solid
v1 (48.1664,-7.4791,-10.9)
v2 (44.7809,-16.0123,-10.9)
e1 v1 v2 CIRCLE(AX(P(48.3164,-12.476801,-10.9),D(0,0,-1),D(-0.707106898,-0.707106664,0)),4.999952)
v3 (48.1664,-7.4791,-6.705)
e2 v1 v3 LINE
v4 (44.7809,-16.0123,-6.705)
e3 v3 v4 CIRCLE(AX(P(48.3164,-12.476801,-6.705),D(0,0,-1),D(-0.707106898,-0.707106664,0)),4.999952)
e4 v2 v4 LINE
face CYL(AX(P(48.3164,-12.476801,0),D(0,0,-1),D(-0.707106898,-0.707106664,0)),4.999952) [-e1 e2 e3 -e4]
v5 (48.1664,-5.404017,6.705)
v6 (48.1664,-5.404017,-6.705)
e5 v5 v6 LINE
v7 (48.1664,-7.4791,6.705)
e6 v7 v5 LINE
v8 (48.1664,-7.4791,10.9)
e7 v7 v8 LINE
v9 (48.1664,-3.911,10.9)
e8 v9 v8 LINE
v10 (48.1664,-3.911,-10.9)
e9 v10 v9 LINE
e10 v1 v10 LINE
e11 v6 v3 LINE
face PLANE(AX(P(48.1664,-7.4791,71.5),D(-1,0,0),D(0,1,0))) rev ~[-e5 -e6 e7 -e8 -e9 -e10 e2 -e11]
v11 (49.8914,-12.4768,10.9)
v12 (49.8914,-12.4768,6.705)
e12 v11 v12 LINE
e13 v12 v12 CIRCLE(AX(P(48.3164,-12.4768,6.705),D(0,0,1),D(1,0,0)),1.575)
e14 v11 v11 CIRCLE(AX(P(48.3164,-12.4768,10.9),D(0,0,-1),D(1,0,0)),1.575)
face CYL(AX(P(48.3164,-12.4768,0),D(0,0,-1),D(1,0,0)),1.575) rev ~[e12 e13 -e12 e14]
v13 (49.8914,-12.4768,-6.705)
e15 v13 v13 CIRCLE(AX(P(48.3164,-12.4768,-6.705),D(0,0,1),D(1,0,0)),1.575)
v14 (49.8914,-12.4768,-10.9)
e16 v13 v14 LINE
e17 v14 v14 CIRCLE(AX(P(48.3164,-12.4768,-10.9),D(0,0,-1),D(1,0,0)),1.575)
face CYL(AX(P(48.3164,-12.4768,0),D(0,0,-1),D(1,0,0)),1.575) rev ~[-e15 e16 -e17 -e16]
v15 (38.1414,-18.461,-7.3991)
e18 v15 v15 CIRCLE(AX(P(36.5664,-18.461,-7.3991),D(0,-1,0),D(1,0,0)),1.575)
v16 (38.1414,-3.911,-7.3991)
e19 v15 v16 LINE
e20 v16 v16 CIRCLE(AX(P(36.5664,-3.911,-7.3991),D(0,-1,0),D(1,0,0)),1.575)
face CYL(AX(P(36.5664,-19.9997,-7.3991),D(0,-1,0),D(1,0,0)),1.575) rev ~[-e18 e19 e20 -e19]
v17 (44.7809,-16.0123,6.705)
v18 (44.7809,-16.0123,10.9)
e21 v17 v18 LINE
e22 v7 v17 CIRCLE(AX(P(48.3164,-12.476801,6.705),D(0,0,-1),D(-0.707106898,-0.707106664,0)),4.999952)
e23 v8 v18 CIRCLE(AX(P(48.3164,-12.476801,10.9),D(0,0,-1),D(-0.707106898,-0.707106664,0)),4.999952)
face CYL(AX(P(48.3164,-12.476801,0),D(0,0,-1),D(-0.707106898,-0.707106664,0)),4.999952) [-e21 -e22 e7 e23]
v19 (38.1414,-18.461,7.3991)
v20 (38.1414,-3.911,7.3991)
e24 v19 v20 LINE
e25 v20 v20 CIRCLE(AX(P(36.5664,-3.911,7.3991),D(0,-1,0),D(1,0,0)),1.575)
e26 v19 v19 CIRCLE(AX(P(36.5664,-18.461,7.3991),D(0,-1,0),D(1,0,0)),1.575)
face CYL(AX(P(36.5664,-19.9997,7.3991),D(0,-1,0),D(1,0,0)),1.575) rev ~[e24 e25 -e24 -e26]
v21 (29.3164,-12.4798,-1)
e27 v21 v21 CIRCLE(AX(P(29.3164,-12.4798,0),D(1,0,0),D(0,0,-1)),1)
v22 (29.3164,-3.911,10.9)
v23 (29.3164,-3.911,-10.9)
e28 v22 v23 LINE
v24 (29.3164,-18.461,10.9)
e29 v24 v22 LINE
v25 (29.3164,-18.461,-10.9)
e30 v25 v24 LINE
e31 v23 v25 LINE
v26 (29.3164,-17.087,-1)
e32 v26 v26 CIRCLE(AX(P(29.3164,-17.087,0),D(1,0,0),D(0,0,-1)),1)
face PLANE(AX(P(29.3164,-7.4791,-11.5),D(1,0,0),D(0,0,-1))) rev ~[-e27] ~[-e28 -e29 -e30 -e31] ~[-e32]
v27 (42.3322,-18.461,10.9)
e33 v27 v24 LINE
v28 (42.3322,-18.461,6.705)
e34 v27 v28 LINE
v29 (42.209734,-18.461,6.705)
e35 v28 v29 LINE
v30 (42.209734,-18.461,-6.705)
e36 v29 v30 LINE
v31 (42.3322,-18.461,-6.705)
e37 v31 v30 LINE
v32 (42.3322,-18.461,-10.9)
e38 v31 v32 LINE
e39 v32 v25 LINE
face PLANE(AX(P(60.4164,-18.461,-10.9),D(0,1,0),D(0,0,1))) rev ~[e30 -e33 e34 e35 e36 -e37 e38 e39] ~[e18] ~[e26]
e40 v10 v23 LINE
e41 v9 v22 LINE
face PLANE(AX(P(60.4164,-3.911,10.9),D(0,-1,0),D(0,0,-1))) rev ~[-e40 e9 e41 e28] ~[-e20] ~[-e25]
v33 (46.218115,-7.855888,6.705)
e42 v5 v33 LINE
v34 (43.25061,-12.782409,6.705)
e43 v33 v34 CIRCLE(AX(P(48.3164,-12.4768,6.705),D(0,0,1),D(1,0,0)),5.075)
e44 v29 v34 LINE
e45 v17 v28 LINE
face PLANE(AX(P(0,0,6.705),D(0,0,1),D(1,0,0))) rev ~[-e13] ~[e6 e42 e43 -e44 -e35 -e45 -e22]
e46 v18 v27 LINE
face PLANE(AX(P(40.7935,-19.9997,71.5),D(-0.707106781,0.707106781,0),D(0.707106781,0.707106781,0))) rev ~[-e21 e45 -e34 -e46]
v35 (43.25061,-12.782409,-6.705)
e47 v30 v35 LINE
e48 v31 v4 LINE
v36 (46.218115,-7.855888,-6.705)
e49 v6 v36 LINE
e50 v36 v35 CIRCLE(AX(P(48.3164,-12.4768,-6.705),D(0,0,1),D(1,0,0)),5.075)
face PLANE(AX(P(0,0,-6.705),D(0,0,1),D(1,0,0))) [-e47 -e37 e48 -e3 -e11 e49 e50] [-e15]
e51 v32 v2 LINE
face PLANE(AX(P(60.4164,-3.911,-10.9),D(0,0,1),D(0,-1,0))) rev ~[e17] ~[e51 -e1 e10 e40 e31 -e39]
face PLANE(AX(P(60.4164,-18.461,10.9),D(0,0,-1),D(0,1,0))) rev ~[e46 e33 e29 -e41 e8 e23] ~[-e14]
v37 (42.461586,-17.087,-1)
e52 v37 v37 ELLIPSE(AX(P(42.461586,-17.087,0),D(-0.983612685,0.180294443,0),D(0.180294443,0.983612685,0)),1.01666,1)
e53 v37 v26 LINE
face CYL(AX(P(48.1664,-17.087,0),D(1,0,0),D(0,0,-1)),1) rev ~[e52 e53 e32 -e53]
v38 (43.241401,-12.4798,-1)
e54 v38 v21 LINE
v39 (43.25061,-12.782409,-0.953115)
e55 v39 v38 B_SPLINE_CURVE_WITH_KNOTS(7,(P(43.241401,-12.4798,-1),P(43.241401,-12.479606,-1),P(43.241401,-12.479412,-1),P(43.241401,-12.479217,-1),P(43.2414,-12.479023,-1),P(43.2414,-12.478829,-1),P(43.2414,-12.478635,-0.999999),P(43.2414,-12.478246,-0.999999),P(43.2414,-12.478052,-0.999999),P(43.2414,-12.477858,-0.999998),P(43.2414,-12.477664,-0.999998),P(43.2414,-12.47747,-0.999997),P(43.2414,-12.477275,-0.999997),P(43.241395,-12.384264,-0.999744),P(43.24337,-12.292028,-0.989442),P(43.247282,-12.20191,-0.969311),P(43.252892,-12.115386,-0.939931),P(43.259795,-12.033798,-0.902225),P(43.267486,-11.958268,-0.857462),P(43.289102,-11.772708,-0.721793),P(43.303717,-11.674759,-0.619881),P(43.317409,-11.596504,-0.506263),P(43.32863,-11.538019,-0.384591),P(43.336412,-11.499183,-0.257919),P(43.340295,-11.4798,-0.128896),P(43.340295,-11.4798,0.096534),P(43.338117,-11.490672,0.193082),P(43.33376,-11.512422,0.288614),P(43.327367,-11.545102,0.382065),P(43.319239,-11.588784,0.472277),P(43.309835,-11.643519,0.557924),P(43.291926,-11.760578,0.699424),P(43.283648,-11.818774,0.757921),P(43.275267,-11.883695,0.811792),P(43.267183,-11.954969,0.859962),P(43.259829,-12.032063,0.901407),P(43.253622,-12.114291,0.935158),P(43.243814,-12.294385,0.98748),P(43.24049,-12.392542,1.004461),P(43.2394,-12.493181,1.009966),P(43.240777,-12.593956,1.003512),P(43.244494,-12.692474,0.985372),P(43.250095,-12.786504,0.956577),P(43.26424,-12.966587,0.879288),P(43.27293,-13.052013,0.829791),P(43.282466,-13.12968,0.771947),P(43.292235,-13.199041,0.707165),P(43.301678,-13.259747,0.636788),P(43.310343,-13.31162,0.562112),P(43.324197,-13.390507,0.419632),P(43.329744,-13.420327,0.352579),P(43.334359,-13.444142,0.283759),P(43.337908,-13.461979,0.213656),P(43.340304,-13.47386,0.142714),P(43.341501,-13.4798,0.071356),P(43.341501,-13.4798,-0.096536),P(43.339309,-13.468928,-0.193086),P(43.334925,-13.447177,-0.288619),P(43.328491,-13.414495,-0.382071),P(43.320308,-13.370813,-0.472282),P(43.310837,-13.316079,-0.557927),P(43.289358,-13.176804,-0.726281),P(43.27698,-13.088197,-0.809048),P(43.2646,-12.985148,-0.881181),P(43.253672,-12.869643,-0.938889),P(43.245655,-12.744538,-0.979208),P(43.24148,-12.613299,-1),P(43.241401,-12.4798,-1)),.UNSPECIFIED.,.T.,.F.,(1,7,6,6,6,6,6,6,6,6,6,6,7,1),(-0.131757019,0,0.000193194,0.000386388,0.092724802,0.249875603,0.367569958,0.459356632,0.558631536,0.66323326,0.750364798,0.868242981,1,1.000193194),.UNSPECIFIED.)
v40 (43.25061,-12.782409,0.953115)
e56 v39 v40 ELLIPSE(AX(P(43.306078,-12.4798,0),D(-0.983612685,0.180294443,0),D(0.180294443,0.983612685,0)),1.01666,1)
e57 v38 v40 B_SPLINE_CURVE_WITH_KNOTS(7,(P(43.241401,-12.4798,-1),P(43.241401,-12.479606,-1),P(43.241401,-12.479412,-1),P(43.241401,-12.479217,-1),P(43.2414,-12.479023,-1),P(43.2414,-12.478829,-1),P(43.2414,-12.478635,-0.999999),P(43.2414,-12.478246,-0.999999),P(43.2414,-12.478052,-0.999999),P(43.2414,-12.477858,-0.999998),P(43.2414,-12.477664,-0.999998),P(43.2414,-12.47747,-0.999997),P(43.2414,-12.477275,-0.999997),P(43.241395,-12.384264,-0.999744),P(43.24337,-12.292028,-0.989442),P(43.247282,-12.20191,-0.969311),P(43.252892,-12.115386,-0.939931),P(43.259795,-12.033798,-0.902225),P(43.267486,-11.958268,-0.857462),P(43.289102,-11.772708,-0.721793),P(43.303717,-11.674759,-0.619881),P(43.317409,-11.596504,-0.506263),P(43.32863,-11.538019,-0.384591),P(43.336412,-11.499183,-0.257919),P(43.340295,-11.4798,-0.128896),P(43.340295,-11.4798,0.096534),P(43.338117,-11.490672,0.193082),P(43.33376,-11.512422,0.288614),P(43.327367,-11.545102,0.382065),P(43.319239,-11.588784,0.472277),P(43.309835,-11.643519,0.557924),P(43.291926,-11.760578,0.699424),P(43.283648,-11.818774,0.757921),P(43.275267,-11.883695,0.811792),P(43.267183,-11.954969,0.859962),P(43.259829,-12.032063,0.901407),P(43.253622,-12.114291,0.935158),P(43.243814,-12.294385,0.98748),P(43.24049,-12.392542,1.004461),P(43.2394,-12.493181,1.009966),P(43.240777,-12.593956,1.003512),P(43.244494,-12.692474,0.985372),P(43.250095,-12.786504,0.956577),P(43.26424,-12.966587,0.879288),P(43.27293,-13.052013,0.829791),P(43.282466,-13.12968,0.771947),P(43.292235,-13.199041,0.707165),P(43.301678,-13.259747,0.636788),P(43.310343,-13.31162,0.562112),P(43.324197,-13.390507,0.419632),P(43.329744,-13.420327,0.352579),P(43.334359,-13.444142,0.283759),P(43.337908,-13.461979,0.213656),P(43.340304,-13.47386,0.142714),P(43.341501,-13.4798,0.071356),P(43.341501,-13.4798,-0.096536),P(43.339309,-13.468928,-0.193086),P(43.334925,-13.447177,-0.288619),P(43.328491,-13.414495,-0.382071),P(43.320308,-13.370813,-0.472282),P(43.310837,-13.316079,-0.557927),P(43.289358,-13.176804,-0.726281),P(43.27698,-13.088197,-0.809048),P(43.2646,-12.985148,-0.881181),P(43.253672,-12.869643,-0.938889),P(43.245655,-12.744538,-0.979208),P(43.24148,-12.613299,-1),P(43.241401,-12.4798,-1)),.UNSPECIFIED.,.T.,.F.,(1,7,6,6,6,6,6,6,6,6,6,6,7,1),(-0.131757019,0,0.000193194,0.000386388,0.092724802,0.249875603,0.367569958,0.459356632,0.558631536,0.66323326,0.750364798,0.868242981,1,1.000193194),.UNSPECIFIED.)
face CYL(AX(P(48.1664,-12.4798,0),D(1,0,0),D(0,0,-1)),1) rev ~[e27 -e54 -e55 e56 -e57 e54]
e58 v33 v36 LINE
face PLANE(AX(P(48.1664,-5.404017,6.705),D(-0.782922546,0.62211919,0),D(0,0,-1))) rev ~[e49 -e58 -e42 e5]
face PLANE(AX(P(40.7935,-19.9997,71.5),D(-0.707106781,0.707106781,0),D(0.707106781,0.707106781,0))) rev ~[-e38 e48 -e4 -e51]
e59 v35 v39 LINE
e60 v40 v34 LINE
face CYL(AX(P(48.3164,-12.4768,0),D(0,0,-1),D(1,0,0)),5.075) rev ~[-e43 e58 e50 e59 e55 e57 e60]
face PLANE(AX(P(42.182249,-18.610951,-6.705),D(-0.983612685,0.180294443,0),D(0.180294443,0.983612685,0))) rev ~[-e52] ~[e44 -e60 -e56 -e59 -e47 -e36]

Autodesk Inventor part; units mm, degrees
sketch "Sketch2" plane through (0, 0, 0) normal (0, 0, 1) x (1, 0, 0)
  line L0 (40.7935, -19.9997) -> (-67.2065, -19.9997)
  line L1 (-67.2065, -19.9997) -> (-67.2065, 11.0003)
  circle A0 centre (48.3164, -12.4768) radius 1.575
  arc A1 (44.7809, -16.0123) -> (48.1664, -7.4791) centre (48.3164, -12.4768) ccw
  line L2 (48.1664, 0.0003) -> (48.1664, -7.4791)
  line L3 (48.3164, -12.4768) -> (48.1664, -12.6268)
  line L4 (44.7809, -16.0123) -> (40.7935, -19.9997)
  line L5 (-67.2065, 11.0003) -> (28.1664, 11.0003)
  line L6 (28.1664, 11.0003) -> (48.1664, 0.0003)
  dimension "d19" = 3.15
  dimension "d88" = 10
  dimension "d90" = 0.15
  dimension "d91" = 10.639
  dimension "d111" = 31
  dimension "d135" = 12.4771
  dimension "d176" = 135
  dimension "d177" = 108
extrude "Extrusion1" add sketch "Sketch2" along normal mid plane 23
sketch "Sketch5" plane through (0, 0, 0) normal (0, 0, 1) x (1, 0, 0)
  circle A0 centre (48.3164, -12.4768) radius 1.575 projected
  circle A1 centre (48.3164, -12.4768) radius 5.075
  circle A2 centre (48.3164, -12.4768) radius 1.5
  point P0 (0, 0)
  dimension "d28" = 3
  dimension "d29" = 10.15
extrude "Extrusion3" cut sketch "Sketch5" along normal mid plane 13.41 contours A1
chamfer "Chamfer2" distance 2 angle 45 1 edges at (48.1664, -7.404, 0)
sketch "Sketch15" plane through (48.1664, -7.4791, -11.5) normal (1, 0, 0) x (0, 0, -1)
  arc A0 (-14.3604, 7.4791) -> (-8.6396, 7.4791) centre (-11.5, 7.4791) ccw
  line L0 (-14.3604, 7.4791) -> (-14.3604, 27.4791)
  line L1 (-14.3604, 27.4791) -> (-8.6396, 27.4791)
  line L2 (-8.6396, 27.4791) -> (-8.6396, 7.4791)
  point P0 (-14.3604, 7.4793)
  point P1 (-11.5, 27.4791)
  dimension "d95" = 5.7208
  dimension "d113" = 20
sketch "Sketch19" plane through (-67.2065, -19.9997, 11.5) normal (0, -1, 0) x (1, 0, 0)
  line L0 (63.0729, -6) -> (91.3729, -6)
  line L1 (91.3729, -6) -> (91.3729, -19.5)
  line L2 (91.3729, -19.5) -> (63.0729, -19.5)
  line L3 (63.0729, -19.5) -> (63.0729, -6)
  line L4 (63.0729, -6) -> (91.3729, -19.5) construction
  line L5 (91.3729, -6) -> (63.0729, -19.5) construction
  line L6 (115.3729, -18.205) -> (115.3729, -4.795) projected
  line L7 (95.3729, 0) -> (0, 0) projected
  line L8 (108, -23) -> (0, -23) projected
  circle A0 centre (77.2229, -12.75) radius 8.1325
  point P0 (67.2065, -11.5)
  dimension "d104" = 13.5
  dimension "d114" = 24
  dimension "d195" = 28.3
  dimension "d205" = 6
  dimension "d224" = 16.265
extrude "Extrusion13" cut sketch "Sketch19" against normal blind 30 contours L0 A0 L2 L3 | L0 A0 L2 | L0 L1 L2 A0
sketch "Sketch21" plane through (-67.2065, -19.9997, 11.5) normal (0, -1, 0) x (1, 0, 0)
  line L0 (63.0729, -6) -> (91.3729, -6) projected
  line L1 (63.0729, -19.5) -> (63.0729, -6) construction
  line L2 (91.3729, -19.5) -> (63.0729, -19.5) construction
  line L3 (63.0729, -6) -> (91.3729, -19.5)
  line L4 (91.3729, -6) -> (63.0729, -19.5)
  line L5 (95.0229, -19.5) -> (59.4229, -19.5)
  line L6 (59.4229, -19.5) -> (59.4229, -6)
  line L7 (59.4229, -6) -> (95.0229, -6)
  line L8 (95.0229, -6) -> (95.0229, -19.5)
  line L9 (95.0229, -19.5) -> (59.4229, -6) construction
  line L10 (59.4229, -19.5) -> (95.0229, -6) construction
  line L11 (108, -23) -> (108, 0) projected
  point P0 (77.2229, -12.75)
  point P1 (26.7729, -20.5)
  point P2 (26.7729, -7)
  dimension "d164" = 35.6
  dimension "d165" = 13.5
extrude "Extrusion14" cut sketch "Sketch21" against normal blind 10.1
sketch "Sketch20" plane through (-67.2065, 11.0003, 11.5) normal (0, 1, 0) x (1, 0, 0)
  line L0 (115.3729, 23) -> (115.3729, 0) projected
  line L1 (115.3729, 11.5) -> (95.3729, 11.5)
  point P0 (67.2065, 11.5)
  dimension "d107" = 20
sweep "Sweep3" cut profiles "Sketch15" path "Sketch20" path curves L1
sketch "Sketch22" plane through (48.1664, -7.4791, 11.5) normal (1, 0, 0) x (0, 0, -1)
  circle A0 centre (11.5, -5.0007) radius 1
  line L0 (23, -12.5207) -> (0, -12.5207) projected
  circle A1 centre (11.5, -9.6079) radius 1
  point P0 (11.5, 7.4791)
  dimension "d126" = 7.52
  dimension "d127" = 2.9128
  dimension "d128" = 2
  dimension "d129" = 2
extrude "Extrusion15" cut sketch "Sketch22" against normal through all
ref_plane "Work Plane4" through (48.1664, -2.8604, 0) normal (0, 1, 0) x (-1, 0, 0)
sketch "Sketch26" plane through (48.1664, -2.8604, 0) normal (0, 1, 0) x (-1, 0, 0)
  line L0 (0, -6.705) -> (0, 6.705) projected
  arc A0 (16.24, -0.7321) -> (16.24, 0.7321) centre (16.24, 0) ccw
  line L1 (16.24, -0.7321) -> (0, -0.7321)
  line L2 (16.24, 0.7321) -> (0, 0.7321)
  line L3 (0, 0.7321) -> (0, -0.7321)
  point P0 (48.1664, 0)
  dimension "d147" = 1.4642
chamfer "Chamfer3" distance 3.6 angle 45 1 edges at (44.7278, -16.0654, 0)
extrude "Extrusion22" add sketch "Sketch26" along normal up to surface surface through (48.1664, 0.0003, 0) normal (0.4819187, 0.8762159, 0)
sketch "Sketch29" plane through (-67.2065, -9.8997, 11.5) normal (0, -1, 0) x (1, 0, 0)
  line L0 (95.0229, -6) -> (95.0229, -19.5) projected
  line L1 (91.3729, -15.7347) -> (95.0229, -15.7347)
  line L2 (95.0229, -15.7347) -> (95.0229, -9.7653)
  line L3 (95.0229, -9.7653) -> (91.3729, -9.7653)
  line L4 (91.3729, -9.7653) -> (91.3729, -15.7347)
  line L5 (91.3729, -19.5) -> (91.3729, -15.7347)
  line L6 (91.3729, -9.7653) -> (91.3729, -6)
  point P0 (67.2065, -11.5)
  dimension "d202" = 3.7653
  dimension "d203" = 3.7653
extrude "Extrusion23" cut sketch "Sketch29" against normal through all
pattern_linear "Rectangular Pattern6" count 2 spacing -31.95 along (1, 0, 0) of "Extrusion23"
pattern_linear "Rectangular Pattern8" count 4 spacing 30 along (0, 0, 1) of "Extrusion1", "Extrusion3", "Chamfer2", "Sweep3", "Extrusion15", "Chamfer3", "Extrusion22"
sketch "Sketch30" plane through (0, 0, 11.5) normal (0, 0, 1) x (1, 0, 0)
  line L0 (48.1664, -7.4791) -> (48.1664, 0.0003) projected
  line L1 (48.1664, 0.0003) -> (28.1664, 11.0003) projected
  line L2 (28.1664, 11.0003) -> (-67.2065, 11.0003) projected
  line L3 (-67.2065, 11.0003) -> (-67.2065, -19.9997) projected
  line L4 (-67.2065, -19.9997) -> (40.7935, -19.9997) projected
  line L5 (40.7935, -19.9997) -> (44.7809, -16.0123) projected
  arc A0 (44.7809, -16.0123) -> (48.1664, -7.4791) centre (48.3164, -12.4768) ccw projected
  circle A1 centre (48.3164, -12.4768) radius 1.575 projected
  circle A2 centre (48.3164, -12.4768) radius 5
  point P0 (0, 0)
  point P1 (28.1664, -19.9997)
extrude "Extrusion24" add sketch "Sketch30" along normal up to surface (7 mm away) contours A2 L5 L4 L3 L2 L1 L0
pattern_linear "Rectangular Pattern9" count 3 spacing 30 along (0, 0, 1) of "Extrusion24"
pattern_linear "Rectangular Pattern10" count 6 spacing 18.5 along (0, 0, 1) of "Extrusion13", "Extrusion14", "Extrusion23", "Rectangular Pattern6"
sketch "Sketch32" plane through (-67.2065, -19.9997, -11.5) normal (0, -1, 0) x (1, 0, 0)
  line L0 (43.9229, 7) -> (57.4229, 7)
  line L1 (57.4229, 7) -> (57.4229, 35.3)
  line L2 (57.4229, 35.3) -> (43.9229, 35.3)
  line L3 (43.9229, 35.3) -> (43.9229, 7)
  line L4 (57.4229, 35.3) -> (43.9229, 7)
  line L5 (57.4229, 7) -> (43.9229, 35.3)
  line L6 (59.4229, 3.5) -> (59.4229, 17) projected
  line L7 (108, 0) -> (0, 0) projected
  point P0 (67.2065, 11.5)
  dimension "d218" = 28.3
  dimension "d219" = 13.5
  dimension "d225" = 2
  dimension "d226" = 7
extrude "Extrusion26" cut sketch "Sketch32" against normal blind 30
sketch "Sketch33" plane through (-67.2065, -19.9997, -11.5) normal (0, -1, 0) x (1, 0, 0)
  line L0 (43.9229, 35.3) -> (57.4229, 35.3) projected
  line L1 (57.4229, 35.3) -> (57.4229, 7) projected
  line L2 (57.4229, 7) -> (43.9229, 7) projected
  line L3 (43.9229, 7) -> (43.9229, 35.3) projected
  line L4 (57.4229, 35.3) -> (43.9229, 7)
  line L5 (57.4229, 7) -> (43.9229, 35.3)
  line L6 (57.4229, 3.35) -> (43.9229, 3.35)
  line L7 (43.9229, 3.35) -> (43.9229, 38.95)
  line L8 (43.9229, 38.95) -> (57.4229, 38.95)
  line L9 (57.4229, 38.95) -> (57.4229, 3.35)
  line L10 (57.4229, 3.35) -> (43.9229, 38.95) construction
  line L11 (43.9229, 3.35) -> (57.4229, 38.95) construction
  point P0 (67.2065, 11.5)
  point P1 (50.6729, 21.15)
  point P2 (57.4229, 7)
  dimension "d240" = 13.5
  dimension "d241" = 35.6
extrude "Extrusion27" cut sketch "Sketch33" against normal blind 10.1
sketch "Sketch34" plane through (-67.2065, -9.8997, -11.5) normal (0, -1, 0) x (1, 0, 0)
  line L0 (57.4229, 3.35) -> (43.9229, 3.35) projected
  line L1 (43.9229, 7) -> (57.4229, 7) projected
  line L2 (57.4229, 7) -> (43.9229, 7) projected
  line L3 (53.6579, 7) -> (47.6879, 7)
  line L4 (47.6879, 7) -> (47.6879, 3.35)
  line L5 (47.6879, 3.35) -> (53.6579, 3.35)
  line L6 (53.6579, 3.35) -> (53.6579, 7)
  line L7 (57.4229, 35.3) -> (57.4229, 7) projected
  line L8 (57.4229, 7) -> (53.6579, 7)
  line L9 (47.6879, 7) -> (43.9229, 7)
  point P0 (67.2065, 11.5)
  point P1 (53.6579, 3.35)
  point P2 (47.6879, 7)
  dimension "d242" = 3.765
extrude "Extrusion28" cut sketch "Sketch34" against normal through all
pattern_linear "Rectangular Pattern11" count 2 spacing 31.95 along (0, 0, 1) of "Extrusion28"
pattern_linear "Rectangular Pattern12" count 2 spacing 70.5 along (0, 0, 1) of "Extrusion26", "Extrusion27", "Extrusion28", "Rectangular Pattern11"
ref_plane "Work Plane16" through (-67.2065, -4.4997, 87.6614) normal (0.9396926, 0, 0.3420201) x (0, 1, 0)
sketch "Sketch37" plane through (-67.2065, -4.4997, 87.6614) normal (0.9396926, 0, 0.3420201) x (0, 1, 0)
  line L0 (-15.5, -7.5229) -> (-7.9771, 0) projected
  circle A0 centre (-7.9771, 0.15) radius 4.925
  circle A1 centre (-7.9771, 0.15) radius 1.575
  point P0 (4.4997, -105.3608)
  dimension "d271" = 0.15
  dimension "d272" = 9.85
  dimension "d273" = 3.15
sketch "Sketch39" plane through (-67.2065, -19.9997, 101.5) normal (0, 0, 1) x (1, 0, 0)
  line L0 (95.3729, 31) -> (0, 31) projected
  line L1 (95.3729, 0) -> (0, 0) projected
  line L2 (0, 31) -> (0, 0) projected
  line L3 (30.3, 0) -> (7, 0)
  line L4 (7, 0) -> (7, 31)
  line L5 (7, 31) -> (30.3, 31)
  line L6 (30.3, 31) -> (30.3, 0)
  point P0 (67.2065, 19.9997)
  point P1 (30.3, 31)
  point P2 (7, 0)
  dimension "d275" = 23.3
  dimension "d276" = 7
extrude "Extrusion36" cut sketch "Sketch39" against normal blind 41 contours L6 L1 L4 L0
sketch "Sketch40" plane through (-36.9065, -19.9997, 101.5) normal (-1, 0, 0) x (0, 0, 1)
  line L0 (-41, 31) -> (-41, 0) projected
  line L1 (-41, 15.5) -> (-26, 15.5)
  circle A0 centre (-26, 15.5) radius 15
  circle A1 centre (-26, 15.5) radius 1.575
  point P0 (-101.5, 19.9997)
  dimension "d279" = 15
  dimension "d280" = 30
  dimension "d281" = 3.15
extrude "Extrusion37" cut sketch "Sketch40" along normal through all contours A1
extrude "Extrusion38" cut sketch "Sketch40" against normal blind 10 contours A1
chamfer "Chamfer5" distance 13.75 angle 45 1 edges at (-36.9065, -4.4997, 101.5)
ref_plane "Work Plane17" through (60.4164, -7.4791, -11.5) normal (1, 0, 0) x (0, 0, -1)
sketch "Sketch41" plane through (60.4164, -7.4791, -11.5) normal (1, 0, 0) x (0, 0, -1)
  line L0 (-0.6, -10.9819) -> (-22.4, -10.9819)
  line L1 (-22.4, -10.9819) -> (-22.4, 3.5681)
  line L2 (-22.4, 3.5681) -> (-0.6, 3.5681)
  line L3 (-0.6, 3.5681) -> (-0.6, -10.9819)
  line L4 (0, -9.9977) -> (0, 0.0023) projected
  line L5 (-18.205, -11.1319) -> (-4.795, -11.1319) projected
  line L6 (-23, 0.0023) -> (-23, -9.9977) projected
  point P0 (-11.5, 7.4791)
  point P1 (0, 0)
  point P2 (0, -8.5333)
  point P3 (-23, -8.5333)
  point P4 (-23, 0)
  dimension "d293" = 14.55
  dimension "d306" = 0.15
  dimension "d307" = 0.6
  dimension "d308" = 0.6
  dimension "d311" = 21.8
extrude "Extrusion39" cut sketch "Sketch41" against normal blind 31.1 keep common part
sketch "Sketch42" plane through (-67.2065, -19.9997, -11.5) normal (0, -1, 0) x (1, 0, 0)
  circle A0 centre (103.7729, 4.1009) radius 1.575
  line L0 (103.7729, 11.5) -> (97.0263, 11.5)
  circle A1 centre (103.7729, 18.8991) radius 1.575
  point P0 (67.2065, 11.5)
  dimension "d302" = 3.15
  dimension "d303" = 0
  dimension "d309" = 3.15
  dimension "d310" = 7.3991
extrude "Extrusion40" cut sketch "Sketch42" against normal blind 25
ref_plane "Work Plane11" through (48.1664, -2.8604, 30) normal (0, 1, 0) x (-1, 0, 0)
ref_plane "Work Plane12" through (48.1664, -2.8604, 60) normal (0, 1, 0) x (-1, 0, 0)
ref_plane "Work Plane13" through (48.1664, -2.8604, 90) normal (0, 1, 0) x (-1, 0, 0)
equation "\"d88\" = diametroFueraUnion"
equation "\"d90\" = tolerancia"
equation "\"d28\" = diametroDentroUnion"
equation "\"d29\" = diametroFueraUnion + tolerancia"
equation "\"d10\" = 10.639"
equation "\"d16\" = 135deg"
equation "\"d26\" = 135deg"
equation "\"d27\" = 135deg"
equation "\"d30\" = 135deg"
equation "\"d34\" = 23"
equation "\"d35\" = 0"
equation "\"d40\" = 135deg"
equation "\"d41\" = 10.639"
equation "\"d42\" = 11.8875"
equation "\"d43\" = 0"
equation "\"diametroDentroUnion\" = 3"
equation "\"diametroFueraUnion\" = 10"
equation "\"d45\" = 15"
equation "\"d39\" = diametroDentroUnion"
equation "\"anchoServo\" = 12.2"
equation "\"tolerancia\" = 0.15"
equation "\"d193\" = 0.15"
equation "\"d199\" = 0.15"
equation "\"d215\" = 0.15"
equation "\"d216\" = 0.15"
equation "\"servoLargo\" = 28"
equation "\"servoLargoConOrejas\" = 35.3"
equation "\"servoAncho\" = 13.2"
equation "\"ServoAlto\" = 29.7"
equation "\"diametroPolea\" = 16.265"
properties part number "sujeciones_dedos_V13"
